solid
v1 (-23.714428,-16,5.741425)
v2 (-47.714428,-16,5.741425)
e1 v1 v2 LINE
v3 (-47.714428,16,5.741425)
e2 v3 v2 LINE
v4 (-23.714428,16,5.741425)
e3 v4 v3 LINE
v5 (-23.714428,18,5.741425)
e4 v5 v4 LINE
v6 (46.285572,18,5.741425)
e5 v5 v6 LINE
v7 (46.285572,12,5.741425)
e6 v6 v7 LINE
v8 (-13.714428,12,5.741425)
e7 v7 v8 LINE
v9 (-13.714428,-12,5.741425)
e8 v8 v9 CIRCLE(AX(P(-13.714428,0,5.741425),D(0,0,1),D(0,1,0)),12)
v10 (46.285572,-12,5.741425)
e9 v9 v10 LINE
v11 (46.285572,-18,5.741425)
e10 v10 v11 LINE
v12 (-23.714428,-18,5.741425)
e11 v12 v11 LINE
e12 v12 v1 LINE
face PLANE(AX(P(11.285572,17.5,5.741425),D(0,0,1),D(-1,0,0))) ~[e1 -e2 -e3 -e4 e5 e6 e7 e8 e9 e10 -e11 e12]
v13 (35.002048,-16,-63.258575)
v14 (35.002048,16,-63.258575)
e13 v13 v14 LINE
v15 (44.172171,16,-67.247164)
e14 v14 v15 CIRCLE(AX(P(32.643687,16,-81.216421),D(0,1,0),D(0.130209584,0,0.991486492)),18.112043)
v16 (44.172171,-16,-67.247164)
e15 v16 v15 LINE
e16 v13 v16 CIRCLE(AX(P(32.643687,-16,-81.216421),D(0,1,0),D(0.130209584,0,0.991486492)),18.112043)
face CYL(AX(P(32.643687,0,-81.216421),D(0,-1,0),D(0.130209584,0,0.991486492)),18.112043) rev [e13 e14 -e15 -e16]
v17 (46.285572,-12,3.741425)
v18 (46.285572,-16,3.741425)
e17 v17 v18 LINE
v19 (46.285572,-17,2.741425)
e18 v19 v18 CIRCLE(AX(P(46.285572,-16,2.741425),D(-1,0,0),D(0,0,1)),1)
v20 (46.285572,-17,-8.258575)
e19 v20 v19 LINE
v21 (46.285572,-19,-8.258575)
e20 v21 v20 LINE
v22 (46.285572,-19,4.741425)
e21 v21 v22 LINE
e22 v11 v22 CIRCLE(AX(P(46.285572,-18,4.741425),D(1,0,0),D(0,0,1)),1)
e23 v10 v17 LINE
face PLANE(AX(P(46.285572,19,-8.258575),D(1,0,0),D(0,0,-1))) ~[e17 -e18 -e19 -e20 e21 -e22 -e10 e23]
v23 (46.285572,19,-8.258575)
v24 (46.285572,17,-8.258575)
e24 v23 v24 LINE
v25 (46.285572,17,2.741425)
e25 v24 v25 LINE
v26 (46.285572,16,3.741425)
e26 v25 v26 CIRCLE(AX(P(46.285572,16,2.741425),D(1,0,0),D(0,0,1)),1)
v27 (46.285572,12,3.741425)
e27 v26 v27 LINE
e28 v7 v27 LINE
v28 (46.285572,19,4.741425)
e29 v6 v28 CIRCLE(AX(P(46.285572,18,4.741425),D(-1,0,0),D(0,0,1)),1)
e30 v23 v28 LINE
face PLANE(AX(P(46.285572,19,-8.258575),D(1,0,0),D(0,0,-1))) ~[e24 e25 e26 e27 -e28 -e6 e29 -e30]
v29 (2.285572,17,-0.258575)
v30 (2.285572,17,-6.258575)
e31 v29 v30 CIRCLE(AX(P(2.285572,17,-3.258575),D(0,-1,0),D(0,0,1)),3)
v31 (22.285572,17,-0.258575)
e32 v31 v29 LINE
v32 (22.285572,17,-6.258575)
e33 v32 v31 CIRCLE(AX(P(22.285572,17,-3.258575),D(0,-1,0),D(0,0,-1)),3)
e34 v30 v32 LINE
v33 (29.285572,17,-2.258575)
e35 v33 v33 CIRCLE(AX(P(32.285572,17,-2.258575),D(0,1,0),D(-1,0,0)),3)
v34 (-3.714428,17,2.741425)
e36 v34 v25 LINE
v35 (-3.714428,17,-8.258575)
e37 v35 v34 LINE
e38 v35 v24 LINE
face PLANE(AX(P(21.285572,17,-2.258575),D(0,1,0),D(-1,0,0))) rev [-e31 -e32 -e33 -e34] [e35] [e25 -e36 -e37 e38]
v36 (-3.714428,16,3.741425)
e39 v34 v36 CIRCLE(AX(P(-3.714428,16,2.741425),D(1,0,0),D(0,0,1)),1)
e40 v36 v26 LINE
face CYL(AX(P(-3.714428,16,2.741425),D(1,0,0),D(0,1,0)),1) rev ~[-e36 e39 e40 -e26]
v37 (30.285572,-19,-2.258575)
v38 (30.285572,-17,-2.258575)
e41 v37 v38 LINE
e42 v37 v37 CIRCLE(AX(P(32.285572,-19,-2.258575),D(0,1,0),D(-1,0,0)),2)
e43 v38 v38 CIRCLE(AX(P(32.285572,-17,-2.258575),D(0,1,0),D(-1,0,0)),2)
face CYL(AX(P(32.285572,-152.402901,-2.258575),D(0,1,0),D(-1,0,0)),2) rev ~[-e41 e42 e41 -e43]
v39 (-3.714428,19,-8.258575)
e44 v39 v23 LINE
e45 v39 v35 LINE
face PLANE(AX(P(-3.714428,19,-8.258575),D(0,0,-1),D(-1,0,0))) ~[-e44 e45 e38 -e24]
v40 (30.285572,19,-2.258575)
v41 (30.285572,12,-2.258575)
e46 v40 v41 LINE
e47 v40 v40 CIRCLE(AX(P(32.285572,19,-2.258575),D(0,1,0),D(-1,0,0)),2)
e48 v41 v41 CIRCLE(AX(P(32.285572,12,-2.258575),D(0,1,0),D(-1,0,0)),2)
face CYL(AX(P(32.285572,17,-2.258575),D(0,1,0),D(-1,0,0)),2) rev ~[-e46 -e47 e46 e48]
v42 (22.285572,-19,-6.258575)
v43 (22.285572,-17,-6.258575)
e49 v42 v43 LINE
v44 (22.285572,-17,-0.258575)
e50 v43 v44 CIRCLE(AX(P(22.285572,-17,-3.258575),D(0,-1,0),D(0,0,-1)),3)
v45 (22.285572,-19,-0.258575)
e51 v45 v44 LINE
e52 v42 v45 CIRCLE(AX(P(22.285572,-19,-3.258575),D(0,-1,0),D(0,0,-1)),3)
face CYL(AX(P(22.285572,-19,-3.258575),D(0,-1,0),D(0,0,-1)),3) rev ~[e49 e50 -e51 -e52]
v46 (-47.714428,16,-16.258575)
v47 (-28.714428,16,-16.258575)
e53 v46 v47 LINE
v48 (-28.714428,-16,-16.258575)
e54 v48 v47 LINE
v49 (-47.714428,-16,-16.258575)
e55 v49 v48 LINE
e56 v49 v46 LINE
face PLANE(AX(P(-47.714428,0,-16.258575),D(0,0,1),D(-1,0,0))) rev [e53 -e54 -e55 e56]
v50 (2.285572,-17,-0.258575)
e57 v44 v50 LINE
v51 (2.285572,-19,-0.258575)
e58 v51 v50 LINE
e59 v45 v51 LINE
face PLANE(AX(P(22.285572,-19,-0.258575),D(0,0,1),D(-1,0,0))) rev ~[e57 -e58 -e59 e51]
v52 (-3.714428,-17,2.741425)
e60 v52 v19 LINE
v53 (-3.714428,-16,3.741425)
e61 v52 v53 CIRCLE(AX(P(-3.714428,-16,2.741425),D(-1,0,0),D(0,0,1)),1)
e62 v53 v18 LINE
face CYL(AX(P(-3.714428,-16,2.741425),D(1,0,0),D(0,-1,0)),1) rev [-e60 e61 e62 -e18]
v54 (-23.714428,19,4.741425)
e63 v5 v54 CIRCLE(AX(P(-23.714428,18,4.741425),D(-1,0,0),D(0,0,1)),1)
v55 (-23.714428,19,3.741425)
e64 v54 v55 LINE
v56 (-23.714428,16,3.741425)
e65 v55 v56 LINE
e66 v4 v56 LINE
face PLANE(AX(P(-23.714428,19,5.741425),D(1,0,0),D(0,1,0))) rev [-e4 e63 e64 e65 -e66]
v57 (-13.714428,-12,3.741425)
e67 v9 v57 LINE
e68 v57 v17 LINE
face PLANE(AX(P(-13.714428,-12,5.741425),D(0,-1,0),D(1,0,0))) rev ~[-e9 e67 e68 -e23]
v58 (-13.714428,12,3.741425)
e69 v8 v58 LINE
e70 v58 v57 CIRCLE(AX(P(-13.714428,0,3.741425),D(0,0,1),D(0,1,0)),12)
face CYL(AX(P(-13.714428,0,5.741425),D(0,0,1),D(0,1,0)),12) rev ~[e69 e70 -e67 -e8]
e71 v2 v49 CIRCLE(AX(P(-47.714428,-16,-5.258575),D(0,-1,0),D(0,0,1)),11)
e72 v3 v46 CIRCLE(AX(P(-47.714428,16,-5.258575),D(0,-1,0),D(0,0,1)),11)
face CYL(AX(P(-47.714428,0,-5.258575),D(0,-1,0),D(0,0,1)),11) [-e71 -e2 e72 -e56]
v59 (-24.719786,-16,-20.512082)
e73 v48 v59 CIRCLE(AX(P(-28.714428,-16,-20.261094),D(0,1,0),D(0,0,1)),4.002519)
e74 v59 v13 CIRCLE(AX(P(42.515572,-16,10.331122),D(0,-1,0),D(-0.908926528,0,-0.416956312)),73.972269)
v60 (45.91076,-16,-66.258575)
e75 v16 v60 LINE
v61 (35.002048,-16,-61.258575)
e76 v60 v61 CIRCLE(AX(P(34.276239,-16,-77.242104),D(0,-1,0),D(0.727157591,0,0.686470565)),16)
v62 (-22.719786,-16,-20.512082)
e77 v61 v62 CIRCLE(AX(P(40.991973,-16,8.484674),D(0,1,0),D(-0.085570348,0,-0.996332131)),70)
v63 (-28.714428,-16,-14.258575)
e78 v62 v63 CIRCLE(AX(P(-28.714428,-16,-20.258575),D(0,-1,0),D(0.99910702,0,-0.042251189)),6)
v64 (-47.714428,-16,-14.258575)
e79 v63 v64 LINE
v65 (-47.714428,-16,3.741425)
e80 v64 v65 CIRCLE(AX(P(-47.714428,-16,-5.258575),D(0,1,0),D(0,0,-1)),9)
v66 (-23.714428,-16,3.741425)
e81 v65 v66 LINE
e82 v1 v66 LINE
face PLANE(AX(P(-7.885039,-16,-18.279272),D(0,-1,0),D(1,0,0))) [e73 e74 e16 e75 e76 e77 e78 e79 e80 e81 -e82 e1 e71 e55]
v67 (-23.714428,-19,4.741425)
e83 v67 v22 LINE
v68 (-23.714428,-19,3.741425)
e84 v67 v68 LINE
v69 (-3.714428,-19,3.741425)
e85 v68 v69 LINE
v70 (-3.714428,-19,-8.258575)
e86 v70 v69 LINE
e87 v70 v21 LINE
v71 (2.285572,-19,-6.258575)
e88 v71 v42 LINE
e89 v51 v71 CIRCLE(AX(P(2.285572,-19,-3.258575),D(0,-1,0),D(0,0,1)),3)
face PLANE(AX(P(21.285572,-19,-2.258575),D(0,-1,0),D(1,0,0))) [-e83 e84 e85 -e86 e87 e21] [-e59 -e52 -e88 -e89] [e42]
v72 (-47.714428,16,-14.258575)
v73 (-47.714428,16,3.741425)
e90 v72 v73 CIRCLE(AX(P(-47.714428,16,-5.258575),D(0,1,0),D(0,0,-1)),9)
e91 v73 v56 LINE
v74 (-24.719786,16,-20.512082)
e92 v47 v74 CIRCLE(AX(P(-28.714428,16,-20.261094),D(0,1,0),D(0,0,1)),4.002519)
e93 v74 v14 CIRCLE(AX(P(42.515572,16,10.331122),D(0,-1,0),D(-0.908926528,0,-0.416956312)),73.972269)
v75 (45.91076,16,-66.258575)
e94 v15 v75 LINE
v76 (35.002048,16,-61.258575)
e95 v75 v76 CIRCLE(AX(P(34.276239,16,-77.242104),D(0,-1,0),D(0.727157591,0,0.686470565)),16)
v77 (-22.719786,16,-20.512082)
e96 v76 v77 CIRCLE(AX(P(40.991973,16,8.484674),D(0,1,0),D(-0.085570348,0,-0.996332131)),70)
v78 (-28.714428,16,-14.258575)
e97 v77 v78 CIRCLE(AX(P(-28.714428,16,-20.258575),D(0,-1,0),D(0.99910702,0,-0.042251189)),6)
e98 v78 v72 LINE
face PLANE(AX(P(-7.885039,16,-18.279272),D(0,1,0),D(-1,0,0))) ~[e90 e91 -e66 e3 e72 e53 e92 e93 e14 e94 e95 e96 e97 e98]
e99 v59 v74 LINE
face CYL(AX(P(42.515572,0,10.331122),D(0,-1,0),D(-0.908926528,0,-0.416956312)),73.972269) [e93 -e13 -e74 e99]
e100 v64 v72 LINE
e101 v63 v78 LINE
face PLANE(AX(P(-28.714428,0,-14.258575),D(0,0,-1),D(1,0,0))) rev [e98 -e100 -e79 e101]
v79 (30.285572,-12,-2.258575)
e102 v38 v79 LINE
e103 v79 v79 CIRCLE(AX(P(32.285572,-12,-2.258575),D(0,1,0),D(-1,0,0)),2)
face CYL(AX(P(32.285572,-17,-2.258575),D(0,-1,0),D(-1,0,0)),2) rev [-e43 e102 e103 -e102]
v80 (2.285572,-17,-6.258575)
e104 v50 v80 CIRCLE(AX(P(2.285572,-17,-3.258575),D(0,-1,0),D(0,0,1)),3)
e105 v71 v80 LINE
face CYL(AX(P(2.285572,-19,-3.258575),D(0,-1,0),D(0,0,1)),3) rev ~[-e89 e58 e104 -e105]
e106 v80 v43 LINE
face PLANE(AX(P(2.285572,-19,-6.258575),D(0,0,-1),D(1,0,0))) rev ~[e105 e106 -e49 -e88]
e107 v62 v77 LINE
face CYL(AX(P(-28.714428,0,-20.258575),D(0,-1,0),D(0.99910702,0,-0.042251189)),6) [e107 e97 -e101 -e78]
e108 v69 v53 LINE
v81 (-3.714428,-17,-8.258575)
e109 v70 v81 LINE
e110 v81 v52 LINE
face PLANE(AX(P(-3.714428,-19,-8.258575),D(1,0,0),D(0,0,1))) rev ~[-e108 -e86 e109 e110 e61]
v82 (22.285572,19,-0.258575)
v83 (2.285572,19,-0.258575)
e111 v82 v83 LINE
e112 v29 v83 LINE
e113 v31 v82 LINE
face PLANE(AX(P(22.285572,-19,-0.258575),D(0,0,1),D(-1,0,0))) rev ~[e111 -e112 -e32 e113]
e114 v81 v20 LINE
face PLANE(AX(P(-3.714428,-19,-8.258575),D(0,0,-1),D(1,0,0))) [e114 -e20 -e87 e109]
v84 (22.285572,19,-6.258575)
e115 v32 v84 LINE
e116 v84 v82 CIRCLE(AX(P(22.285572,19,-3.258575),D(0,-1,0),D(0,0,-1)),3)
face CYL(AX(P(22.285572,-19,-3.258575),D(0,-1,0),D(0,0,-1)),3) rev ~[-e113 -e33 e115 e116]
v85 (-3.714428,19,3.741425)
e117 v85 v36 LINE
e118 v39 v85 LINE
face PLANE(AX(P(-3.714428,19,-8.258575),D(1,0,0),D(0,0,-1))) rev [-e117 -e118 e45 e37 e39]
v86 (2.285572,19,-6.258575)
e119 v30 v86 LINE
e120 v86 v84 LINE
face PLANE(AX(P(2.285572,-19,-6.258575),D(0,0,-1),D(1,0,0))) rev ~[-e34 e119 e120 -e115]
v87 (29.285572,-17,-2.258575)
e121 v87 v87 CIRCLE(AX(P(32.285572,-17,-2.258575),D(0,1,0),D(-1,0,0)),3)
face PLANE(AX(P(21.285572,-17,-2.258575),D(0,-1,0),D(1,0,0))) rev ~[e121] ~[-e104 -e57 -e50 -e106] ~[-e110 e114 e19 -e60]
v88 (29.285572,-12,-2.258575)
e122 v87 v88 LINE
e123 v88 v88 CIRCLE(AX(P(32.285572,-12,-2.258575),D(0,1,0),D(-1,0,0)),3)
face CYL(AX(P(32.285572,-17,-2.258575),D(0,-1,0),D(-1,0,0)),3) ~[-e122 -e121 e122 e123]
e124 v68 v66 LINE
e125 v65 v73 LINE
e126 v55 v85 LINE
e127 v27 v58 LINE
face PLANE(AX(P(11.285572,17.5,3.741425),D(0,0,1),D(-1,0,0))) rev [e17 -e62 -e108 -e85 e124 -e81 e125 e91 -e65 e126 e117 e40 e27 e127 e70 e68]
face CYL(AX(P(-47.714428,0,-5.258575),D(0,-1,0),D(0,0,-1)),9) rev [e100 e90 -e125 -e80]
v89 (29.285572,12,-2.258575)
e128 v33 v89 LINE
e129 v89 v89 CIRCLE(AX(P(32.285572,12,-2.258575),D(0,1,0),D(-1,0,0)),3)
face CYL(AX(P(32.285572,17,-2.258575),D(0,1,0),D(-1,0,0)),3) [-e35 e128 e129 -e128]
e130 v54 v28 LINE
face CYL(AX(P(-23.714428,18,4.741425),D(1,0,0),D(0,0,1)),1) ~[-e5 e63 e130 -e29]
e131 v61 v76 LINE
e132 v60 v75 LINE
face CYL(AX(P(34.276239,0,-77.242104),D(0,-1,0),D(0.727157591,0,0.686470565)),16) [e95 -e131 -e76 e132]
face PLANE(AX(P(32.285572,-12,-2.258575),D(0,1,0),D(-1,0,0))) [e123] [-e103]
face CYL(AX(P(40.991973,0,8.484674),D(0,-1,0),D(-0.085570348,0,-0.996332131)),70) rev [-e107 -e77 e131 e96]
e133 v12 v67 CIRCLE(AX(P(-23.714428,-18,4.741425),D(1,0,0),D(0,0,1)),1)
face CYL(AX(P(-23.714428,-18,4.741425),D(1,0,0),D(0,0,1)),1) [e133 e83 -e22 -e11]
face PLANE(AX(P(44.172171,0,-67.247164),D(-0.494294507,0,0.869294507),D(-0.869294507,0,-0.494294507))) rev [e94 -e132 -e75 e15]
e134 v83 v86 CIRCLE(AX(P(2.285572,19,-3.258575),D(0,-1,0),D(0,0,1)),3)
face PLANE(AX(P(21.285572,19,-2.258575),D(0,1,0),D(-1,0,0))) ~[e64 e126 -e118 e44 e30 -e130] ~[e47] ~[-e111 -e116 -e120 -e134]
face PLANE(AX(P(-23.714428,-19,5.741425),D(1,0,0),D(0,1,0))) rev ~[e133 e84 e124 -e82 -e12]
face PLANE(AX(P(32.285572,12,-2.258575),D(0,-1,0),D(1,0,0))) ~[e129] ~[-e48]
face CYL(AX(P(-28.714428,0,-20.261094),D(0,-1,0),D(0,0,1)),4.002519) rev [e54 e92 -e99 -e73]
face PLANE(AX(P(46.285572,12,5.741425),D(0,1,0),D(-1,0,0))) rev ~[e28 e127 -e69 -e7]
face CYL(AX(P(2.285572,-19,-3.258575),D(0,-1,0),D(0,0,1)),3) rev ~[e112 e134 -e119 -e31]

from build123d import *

# Parameters (mm, degrees)
F1_DEPTH  = 16
F2_W      = 70
F2_H      = 3
F3_DEPTH  = 2
F4_W      = 50
F4_H      = 12
F5_DEPTH  = 2
F6_R      = 1
F9_DEPTH  = 2
F11_DEPTH = 38.001
F13_D     = 4
F14_R     = 3
F14_R_2   = 2
F15_DEPTH = 5


# Not quite as in the source:
# - a pattern or mirror of a feature is missing from the dataset's text; its kind, count and spacing are read off the source's solid


with BuildPart() as f1:
    # F0 (on Front) → F1 (new body)
    with BuildSketch(Plane.XZ):
        with BuildLine():
            Line((46.2855722755, 5.7414249778), (-47.7144277245, 5.7414249778))
            ThreePointArc((-47.7144277245, 5.7414249778), (-58.7144277245, -5.2585750222), (-47.7144277245, -16.2585750222))
            Line((-47.7144277245, -16.2585750222), (-28.7144277245, -16.2585750222))
            ThreePointArc((-28.7144277245, -16.2585750222), (-25.7968307423, -17.5210599177), (-24.7197856057, -20.5120821569))
            ThreePointArc((-24.7197856057, -20.5120821569), (-0.5386319719, -49.8206199667), (35.0020481502, -63.2585750222))
            ThreePointArc((35.0020481502, -63.2585750222), (39.8678360266, -64.6074545818), (44.1721712505, -67.2471640366))
            Line((44.1721712505, -67.2471640366), (45.9107602648, -66.2585750222))
            ThreePointArc((45.9107602648, -66.2585750222), (40.9429054682, -62.6971545828), (35.0020481502, -61.2585750222))
            ThreePointArc((35.0020481502, -61.2585750222), (0.6230450398, -48.7022972109), (-22.7197856057, -20.5120821569))
            ThreePointArc((-22.7197856057, -20.5120821569), (-24.3830859689, -16.1065299122), (-28.7144277245, -14.2585750222))
            Line((-28.7144277245, -14.2585750222), (-47.7144277245, -14.2585750222))
            ThreePointArc((-47.7144277245, -14.2585750222), (-56.7144277245, -5.2585750222), (-47.7144277245, 3.7414249778))
            Line((-47.7144277245, 3.7414249778), (46.2855722755, 3.7414249778))
            Line((46.2855722755, 3.7414249778), (46.2855722755, 5.7414249778))
        make_face()
    extrude(amount=F1_DEPTH)

    # F2 (on face) → F3 (join)
    with BuildSketch(Plane.XY.offset(5.7414249778)):
        with Locations((11.2855722755, -17.5)):
            Rectangle(F2_W, F2_H)
    extrude(amount=-F3_DEPTH)

    # F4 (on face) → F5 (join)
    with BuildSketch(Plane.XZ.offset(19)):
        with Locations((21.2855722755, -2.2585750222)):
            Rectangle(F4_W, F4_H)
    extrude(amount=-F5_DEPTH)

    # F6
    f6_edges = [f1.edges().sort_by_distance(p)[0] for p in [
        (11.285572, -19, 5.741425),
        (21.285572, -17, 3.741425),
    ]]
    fillet(f6_edges, radius=F6_R)

    # F7: F1 across plane


with BuildPart() as f1_1:
    add(f1.part)
    add(f1.part.mirror(Plane.XZ))

    # F8 (on face) → F9 (cut)
    with BuildSketch(Plane.XY.offset(5.7414249778)):
        with BuildLine():
            Line((46.2855722755, 12), (-13.7144277245, 12))
            ThreePointArc((-13.7144277245, 12), (-25.7144277245, 0), (-13.7144277245, -12))
            Line((-13.7144277245, -12), (46.2855722755, -12))
            Line((46.2855722755, -12), (46.2855722755, 12))
        make_face()
    extrude(amount=-F9_DEPTH, mode=Mode.SUBTRACT)

    # F10 (on face) → F11 (cut, through all)
    with BuildSketch(Plane.XZ.offset(19)):
        with BuildLine():
            ThreePointArc((2.2855722755, -0.2585750222), (-0.7144277245, -3.2585750222), (2.2855722755, -6.2585750222))
            Line((2.2855722755, -6.2585750222), (22.2855722755, -6.2585750222))
            ThreePointArc((22.2855722755, -6.2585750222), (25.2855722755, -3.2585750222), (22.2855722755, -0.2585750222))
            Line((22.2855722755, -0.2585750222), (2.2855722755, -0.2585750222))
        make_face()
    extrude(amount=-F11_DEPTH, mode=Mode.SUBTRACT)

    # F13 (through all)
    with Locations(Plane.XZ.offset(19)):
        with Locations((32.2855722755, -2.2585750222)):
            Hole(F13_D / 2)

    # F14 (on face) → F15 (join)
    with BuildSketch(Plane(origin=(0, -17, 0), x_dir=(-1, 0, 0), z_dir=(0, 1, 0))):
        with Locations((-32.2855722755, -2.2585750222)):
            Circle(F14_R)
        with Locations((-32.2855722755, -2.2585750222)):
            Circle(F14_R_2, mode=Mode.SUBTRACT)
    f15 = extrude(amount=F15_DEPTH)

    # F15_copies: F15 across plane
    add(f15.mirror(Plane.ZX))


solid = f1_1.part
